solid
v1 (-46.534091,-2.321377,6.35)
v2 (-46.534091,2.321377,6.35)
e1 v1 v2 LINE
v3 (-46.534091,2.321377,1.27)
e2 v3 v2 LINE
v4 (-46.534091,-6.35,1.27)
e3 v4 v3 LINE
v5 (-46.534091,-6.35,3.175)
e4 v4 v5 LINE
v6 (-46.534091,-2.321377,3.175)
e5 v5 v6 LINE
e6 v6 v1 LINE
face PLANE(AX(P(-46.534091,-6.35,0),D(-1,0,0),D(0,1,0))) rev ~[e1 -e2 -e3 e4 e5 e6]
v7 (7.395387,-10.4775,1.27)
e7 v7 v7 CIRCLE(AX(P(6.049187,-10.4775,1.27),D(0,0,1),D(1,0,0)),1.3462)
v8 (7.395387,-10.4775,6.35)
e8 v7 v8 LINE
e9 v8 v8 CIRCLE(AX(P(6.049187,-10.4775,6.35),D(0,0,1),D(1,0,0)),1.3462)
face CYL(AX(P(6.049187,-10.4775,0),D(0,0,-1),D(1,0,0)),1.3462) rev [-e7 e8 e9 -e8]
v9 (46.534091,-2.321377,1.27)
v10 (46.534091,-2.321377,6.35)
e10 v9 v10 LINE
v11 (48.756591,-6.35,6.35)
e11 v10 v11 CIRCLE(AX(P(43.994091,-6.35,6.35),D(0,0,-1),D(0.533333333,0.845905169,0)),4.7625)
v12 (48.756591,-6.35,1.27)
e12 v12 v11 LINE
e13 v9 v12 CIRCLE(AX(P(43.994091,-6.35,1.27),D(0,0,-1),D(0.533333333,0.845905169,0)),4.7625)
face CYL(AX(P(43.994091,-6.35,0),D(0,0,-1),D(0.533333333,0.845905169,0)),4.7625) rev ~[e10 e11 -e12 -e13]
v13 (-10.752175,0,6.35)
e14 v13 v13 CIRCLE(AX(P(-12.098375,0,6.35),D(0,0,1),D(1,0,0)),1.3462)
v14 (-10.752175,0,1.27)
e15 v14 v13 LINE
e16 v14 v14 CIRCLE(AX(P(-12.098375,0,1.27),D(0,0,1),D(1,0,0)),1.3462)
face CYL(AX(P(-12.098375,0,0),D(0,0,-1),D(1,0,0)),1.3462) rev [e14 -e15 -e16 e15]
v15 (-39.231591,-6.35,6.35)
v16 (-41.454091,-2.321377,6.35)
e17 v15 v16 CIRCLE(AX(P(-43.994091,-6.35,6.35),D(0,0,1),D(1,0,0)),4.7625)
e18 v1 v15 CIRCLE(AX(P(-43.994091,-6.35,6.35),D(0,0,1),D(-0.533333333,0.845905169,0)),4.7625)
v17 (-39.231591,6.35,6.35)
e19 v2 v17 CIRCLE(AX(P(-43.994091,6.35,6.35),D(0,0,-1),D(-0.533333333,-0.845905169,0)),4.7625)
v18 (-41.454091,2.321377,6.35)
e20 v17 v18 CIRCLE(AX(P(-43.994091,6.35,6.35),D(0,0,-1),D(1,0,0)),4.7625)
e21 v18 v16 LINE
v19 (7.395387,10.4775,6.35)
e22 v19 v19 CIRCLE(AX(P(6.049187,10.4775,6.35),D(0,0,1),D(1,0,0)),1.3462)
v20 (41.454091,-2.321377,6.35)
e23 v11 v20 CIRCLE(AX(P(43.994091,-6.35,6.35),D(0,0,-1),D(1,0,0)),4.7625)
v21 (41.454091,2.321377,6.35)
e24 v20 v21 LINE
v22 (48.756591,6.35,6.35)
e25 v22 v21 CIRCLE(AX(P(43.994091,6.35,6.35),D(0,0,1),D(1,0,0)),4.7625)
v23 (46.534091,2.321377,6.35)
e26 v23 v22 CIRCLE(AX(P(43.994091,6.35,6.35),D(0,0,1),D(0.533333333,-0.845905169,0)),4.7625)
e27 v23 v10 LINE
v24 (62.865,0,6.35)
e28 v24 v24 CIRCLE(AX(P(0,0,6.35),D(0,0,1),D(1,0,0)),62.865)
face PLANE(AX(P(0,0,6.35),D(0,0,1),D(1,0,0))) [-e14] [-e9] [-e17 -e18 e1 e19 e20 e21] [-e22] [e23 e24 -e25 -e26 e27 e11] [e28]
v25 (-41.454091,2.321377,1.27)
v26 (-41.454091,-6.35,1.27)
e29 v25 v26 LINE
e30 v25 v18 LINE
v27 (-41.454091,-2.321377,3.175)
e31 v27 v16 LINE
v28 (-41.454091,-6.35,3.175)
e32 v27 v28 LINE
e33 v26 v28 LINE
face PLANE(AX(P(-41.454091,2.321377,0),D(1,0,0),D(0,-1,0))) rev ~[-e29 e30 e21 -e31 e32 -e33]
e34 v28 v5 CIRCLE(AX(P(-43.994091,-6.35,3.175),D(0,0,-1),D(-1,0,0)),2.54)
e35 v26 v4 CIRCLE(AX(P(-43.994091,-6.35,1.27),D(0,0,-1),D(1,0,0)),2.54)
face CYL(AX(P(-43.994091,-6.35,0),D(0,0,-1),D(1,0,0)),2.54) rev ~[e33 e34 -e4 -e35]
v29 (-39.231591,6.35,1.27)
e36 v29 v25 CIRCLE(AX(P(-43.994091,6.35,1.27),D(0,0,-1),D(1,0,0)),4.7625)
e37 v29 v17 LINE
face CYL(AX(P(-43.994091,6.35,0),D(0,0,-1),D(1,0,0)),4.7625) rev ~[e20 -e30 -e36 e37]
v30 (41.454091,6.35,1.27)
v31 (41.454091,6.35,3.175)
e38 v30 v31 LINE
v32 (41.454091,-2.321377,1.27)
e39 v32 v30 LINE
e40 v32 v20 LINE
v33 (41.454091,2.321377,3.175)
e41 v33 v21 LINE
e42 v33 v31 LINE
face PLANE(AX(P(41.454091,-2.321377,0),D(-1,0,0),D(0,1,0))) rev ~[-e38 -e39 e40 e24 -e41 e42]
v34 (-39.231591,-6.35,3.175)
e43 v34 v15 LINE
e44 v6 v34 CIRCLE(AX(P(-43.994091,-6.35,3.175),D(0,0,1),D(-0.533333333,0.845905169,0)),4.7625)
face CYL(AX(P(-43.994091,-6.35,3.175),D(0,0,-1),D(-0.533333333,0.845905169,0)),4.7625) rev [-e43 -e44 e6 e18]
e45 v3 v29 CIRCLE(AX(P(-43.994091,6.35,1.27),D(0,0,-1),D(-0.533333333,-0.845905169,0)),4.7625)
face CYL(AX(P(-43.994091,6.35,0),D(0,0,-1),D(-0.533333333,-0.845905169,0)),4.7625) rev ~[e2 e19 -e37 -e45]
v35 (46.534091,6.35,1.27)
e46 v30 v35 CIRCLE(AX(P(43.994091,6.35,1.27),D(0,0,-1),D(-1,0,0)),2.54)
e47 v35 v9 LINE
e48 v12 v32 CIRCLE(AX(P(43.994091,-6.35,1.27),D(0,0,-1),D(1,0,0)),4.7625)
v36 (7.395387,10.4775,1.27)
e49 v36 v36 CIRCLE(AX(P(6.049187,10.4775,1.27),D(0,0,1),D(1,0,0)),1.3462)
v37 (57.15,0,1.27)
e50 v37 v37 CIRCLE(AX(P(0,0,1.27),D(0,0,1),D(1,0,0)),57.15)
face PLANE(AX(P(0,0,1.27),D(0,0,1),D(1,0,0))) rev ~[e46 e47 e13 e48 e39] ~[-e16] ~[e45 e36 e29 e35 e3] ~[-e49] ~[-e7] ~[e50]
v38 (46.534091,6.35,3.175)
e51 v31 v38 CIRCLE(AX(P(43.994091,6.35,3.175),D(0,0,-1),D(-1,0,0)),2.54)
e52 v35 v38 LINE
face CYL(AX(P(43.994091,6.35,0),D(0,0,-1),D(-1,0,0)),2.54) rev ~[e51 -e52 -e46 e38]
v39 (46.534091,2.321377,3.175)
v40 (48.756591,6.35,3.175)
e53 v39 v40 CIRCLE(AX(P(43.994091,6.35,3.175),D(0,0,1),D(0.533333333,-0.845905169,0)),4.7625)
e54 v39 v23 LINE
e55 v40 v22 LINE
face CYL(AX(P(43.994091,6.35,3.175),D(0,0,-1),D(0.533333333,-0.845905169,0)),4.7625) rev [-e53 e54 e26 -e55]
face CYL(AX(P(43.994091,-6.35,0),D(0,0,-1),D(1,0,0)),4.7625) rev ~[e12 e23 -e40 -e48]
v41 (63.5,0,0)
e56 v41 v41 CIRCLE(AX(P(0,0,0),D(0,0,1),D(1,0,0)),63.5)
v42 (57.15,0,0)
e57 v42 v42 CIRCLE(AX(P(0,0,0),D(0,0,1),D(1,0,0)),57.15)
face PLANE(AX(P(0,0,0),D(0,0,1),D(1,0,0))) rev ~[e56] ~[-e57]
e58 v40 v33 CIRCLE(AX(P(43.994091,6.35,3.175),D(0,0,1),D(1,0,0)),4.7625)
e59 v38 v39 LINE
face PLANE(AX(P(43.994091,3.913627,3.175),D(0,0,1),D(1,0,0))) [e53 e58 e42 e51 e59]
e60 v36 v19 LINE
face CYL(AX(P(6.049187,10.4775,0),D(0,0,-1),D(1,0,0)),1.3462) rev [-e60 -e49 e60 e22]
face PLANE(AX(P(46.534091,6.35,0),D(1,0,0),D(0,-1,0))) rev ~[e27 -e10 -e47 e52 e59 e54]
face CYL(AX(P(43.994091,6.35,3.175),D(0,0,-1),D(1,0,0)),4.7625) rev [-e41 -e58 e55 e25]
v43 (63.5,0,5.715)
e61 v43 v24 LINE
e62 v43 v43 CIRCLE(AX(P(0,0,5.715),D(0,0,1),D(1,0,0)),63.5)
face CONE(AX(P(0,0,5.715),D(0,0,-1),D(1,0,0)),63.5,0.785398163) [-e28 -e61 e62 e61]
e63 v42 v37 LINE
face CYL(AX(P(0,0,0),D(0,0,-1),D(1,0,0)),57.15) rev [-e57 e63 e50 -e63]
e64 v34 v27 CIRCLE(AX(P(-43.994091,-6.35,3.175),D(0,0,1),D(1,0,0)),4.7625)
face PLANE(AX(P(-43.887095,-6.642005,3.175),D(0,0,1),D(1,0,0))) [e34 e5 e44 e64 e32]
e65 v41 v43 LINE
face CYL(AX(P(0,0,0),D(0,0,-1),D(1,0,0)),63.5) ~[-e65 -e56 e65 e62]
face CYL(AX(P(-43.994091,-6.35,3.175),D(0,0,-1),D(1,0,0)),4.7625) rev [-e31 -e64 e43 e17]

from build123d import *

# Parameters (mm, degrees)
F0_R     = 63.5
F0_R_2   = 57.15
F0_R_3   = 1.3462
F1_DEPTH = 6.35
F2_START = 3.175
F2_DEPTH = 3.175
F3_SIZE  = 0.635
F4_DEPTH = 1.27


with BuildPart() as f1:
    # F0 (on Top) → F1 (new body)
    with BuildSketch(Plane.XY):
        Circle(F0_R)
        Circle(F0_R_2, mode=Mode.SUBTRACT)
        Circle(F0_R_2)
        with Locations((6.0491874454, -10.4775)):
            Circle(F0_R_3, mode=Mode.SUBTRACT)
        with BuildLine():
            ThreePointArc((-41.4540905122, -2.3213766309), (-39.8240691544, -4.0494939415), (-39.2315905122, -6.35))
            ThreePointArc((-39.2315905122, -6.35), (-46.2945965707, -10.5200213579), (-46.5340905122, -2.3213766309))
            Line((-46.5340905122, -2.3213766309), (-46.5340905122, 2.3213766309))
            ThreePointArc((-46.5340905122, 2.3213766309), (-46.2945965707, 10.5200213579), (-39.2315905122, 6.35))
            ThreePointArc((-39.2315905122, 6.35), (-39.8240691544, 4.0494939415), (-41.4540905122, 2.3213766309))
            Line((-41.4540905122, 2.3213766309), (-41.4540905122, -2.3213766309))
        make_face(mode=Mode.SUBTRACT)
        with Locations((-12.0983748909, 0)):
            Circle(F0_R_3, mode=Mode.SUBTRACT)
        with Locations((6.0491874454, 10.4775)):
            Circle(F0_R_3, mode=Mode.SUBTRACT)
        with BuildLine():
            ThreePointArc((48.7565905122, 6.35), (48.1641118701, 4.0494939415), (46.5340905122, 2.3213766309))
            Line((46.5340905122, 2.3213766309), (46.5340905122, -2.3213766309))
            ThreePointArc((46.5340905122, -2.3213766309), (48.1641118701, -4.0494939415), (48.7565905122, -6.35))
            ThreePointArc((48.7565905122, -6.35), (41.6935844538, -10.5200213579), (41.4540905122, -2.3213766309))
            Line((41.4540905122, -2.3213766309), (41.4540905122, 2.3213766309))
            ThreePointArc((41.4540905122, 2.3213766309), (41.6935844538, 10.5200213579), (48.7565905122, 6.35))
        make_face(mode=Mode.SUBTRACT)
        with BuildLine():
            ThreePointArc((-46.5340905122, -2.3213766309), (-46.2945965707, -10.5200213579), (-39.2315905122, -6.35))
            ThreePointArc((-39.2315905122, -6.35), (-39.8240691544, -4.0494939415), (-41.4540905122, -2.3213766309))
            Line((-41.4540905122, -2.3213766309), (-41.4540905122, -6.35))
            ThreePointArc((-41.4540905122, -6.35), (-43.9940905122, -8.89), (-46.5340905122, -6.35))
            Line((-46.5340905122, -6.35), (-46.5340905122, -2.3213766309))
        make_face()
        with BuildLine():
            ThreePointArc((41.4540905122, 6.35), (43.9940905122, 8.89), (46.5340905122, 6.35))
            Line((46.5340905122, 6.35), (46.5340905122, 2.3213766309))
            ThreePointArc((46.5340905122, 2.3213766309), (48.1641118701, 4.0494939415), (48.7565905122, 6.35))
            ThreePointArc((48.7565905122, 6.35), (41.6935844538, 10.5200213579), (41.4540905122, 2.3213766309))
            Line((41.4540905122, 2.3213766309), (41.4540905122, 6.35))
        make_face()
    extrude(amount=F1_DEPTH)

    # F0 (on Top) → F2 (cut)
    with BuildSketch(Plane.XY.offset(F2_START)):
        with BuildLine():
            ThreePointArc((-46.5340905122, -2.3213766309), (-46.2945965707, -10.5200213579), (-39.2315905122, -6.35))
            ThreePointArc((-39.2315905122, -6.35), (-39.8240691544, -4.0494939415), (-41.4540905122, -2.3213766309))
            Line((-41.4540905122, -2.3213766309), (-41.4540905122, -6.35))
            ThreePointArc((-41.4540905122, -6.35), (-43.9940905122, -8.89), (-46.5340905122, -6.35))
            Line((-46.5340905122, -6.35), (-46.5340905122, -2.3213766309))
        make_face()
        with BuildLine():
            Line((-41.4540905122, -6.35), (-41.4540905122, -2.3213766309))
            ThreePointArc((-41.4540905122, -2.3213766309), (-43.9940905122, -1.5875), (-46.5340905122, -2.3213766309))
            Line((-46.5340905122, -2.3213766309), (-46.5340905122, -6.35))
            ThreePointArc((-46.5340905122, -6.35), (-43.9940905122, -3.81), (-41.4540905122, -6.35))
        make_face()
        with BuildLine():
            Line((46.5340905122, 2.3213766309), (46.5340905122, 6.35))
            ThreePointArc((46.5340905122, 6.35), (43.9940905122, 3.81), (41.4540905122, 6.35))
            Line((41.4540905122, 6.35), (41.4540905122, 2.3213766309))
            ThreePointArc((41.4540905122, 2.3213766309), (43.9940905122, 1.5875), (46.5340905122, 2.3213766309))
        make_face()
        with BuildLine():
            ThreePointArc((41.4540905122, 6.35), (43.9940905122, 8.89), (46.5340905122, 6.35))
            Line((46.5340905122, 6.35), (46.5340905122, 2.3213766309))
            ThreePointArc((46.5340905122, 2.3213766309), (48.1641118701, 4.0494939415), (48.7565905122, 6.35))
            ThreePointArc((48.7565905122, 6.35), (41.6935844538, 10.5200213579), (41.4540905122, 2.3213766309))
            Line((41.4540905122, 2.3213766309), (41.4540905122, 6.35))
        make_face()
    extrude(amount=F2_DEPTH, mode=Mode.SUBTRACT)

    # F3
    f3_edges = [f1.edges().sort_by_distance(p)[0] for p in [
        (-63.5, 0, 6.35),
    ]]
    chamfer(f3_edges, length=F3_SIZE)

    # F0 (on Top) → F4 (cut)
    with BuildSketch(Plane.XY):
        Circle(F0_R_2)
        with Locations((6.0491874454, -10.4775)):
            Circle(F0_R_3, mode=Mode.SUBTRACT)
        with BuildLine():
            ThreePointArc((-41.4540905122, -2.3213766309), (-39.8240691544, -4.0494939415), (-39.2315905122, -6.35))
            ThreePointArc((-39.2315905122, -6.35), (-46.2945965707, -10.5200213579), (-46.5340905122, -2.3213766309))
            Line((-46.5340905122, -2.3213766309), (-46.5340905122, 2.3213766309))
            ThreePointArc((-46.5340905122, 2.3213766309), (-46.2945965707, 10.5200213579), (-39.2315905122, 6.35))
            ThreePointArc((-39.2315905122, 6.35), (-39.8240691544, 4.0494939415), (-41.4540905122, 2.3213766309))
            Line((-41.4540905122, 2.3213766309), (-41.4540905122, -2.3213766309))
        make_face(mode=Mode.SUBTRACT)
        with Locations((-12.0983748909, 0)):
            Circle(F0_R_3, mode=Mode.SUBTRACT)
        with Locations((6.0491874454, 10.4775)):
            Circle(F0_R_3, mode=Mode.SUBTRACT)
        with BuildLine():
            ThreePointArc((48.7565905122, 6.35), (48.1641118701, 4.0494939415), (46.5340905122, 2.3213766309))
            Line((46.5340905122, 2.3213766309), (46.5340905122, -2.3213766309))
            ThreePointArc((46.5340905122, -2.3213766309), (48.1641118701, -4.0494939415), (48.7565905122, -6.35))
            ThreePointArc((48.7565905122, -6.35), (41.6935844538, -10.5200213579), (41.4540905122, -2.3213766309))
            Line((41.4540905122, -2.3213766309), (41.4540905122, 2.3213766309))
            ThreePointArc((41.4540905122, 2.3213766309), (41.6935844538, 10.5200213579), (48.7565905122, 6.35))
        make_face(mode=Mode.SUBTRACT)
        with BuildLine():
            ThreePointArc((-46.5340905122, -2.3213766309), (-46.2945965707, -10.5200213579), (-39.2315905122, -6.35))
            ThreePointArc((-39.2315905122, -6.35), (-39.8240691544, -4.0494939415), (-41.4540905122, -2.3213766309))
            Line((-41.4540905122, -2.3213766309), (-41.4540905122, -6.35))
            ThreePointArc((-41.4540905122, -6.35), (-43.9940905122, -8.89), (-46.5340905122, -6.35))
            Line((-46.5340905122, -6.35), (-46.5340905122, -2.3213766309))
        make_face()
        with BuildLine():
            ThreePointArc((41.4540905122, 6.35), (43.9940905122, 8.89), (46.5340905122, 6.35))
            Line((46.5340905122, 6.35), (46.5340905122, 2.3213766309))
            ThreePointArc((46.5340905122, 2.3213766309), (48.1641118701, 4.0494939415), (48.7565905122, 6.35))
            ThreePointArc((48.7565905122, 6.35), (41.6935844538, 10.5200213579), (41.4540905122, 2.3213766309))
            Line((41.4540905122, 2.3213766309), (41.4540905122, 6.35))
        make_face()
    extrude(amount=F4_DEPTH, mode=Mode.SUBTRACT)


solid = f1.part
